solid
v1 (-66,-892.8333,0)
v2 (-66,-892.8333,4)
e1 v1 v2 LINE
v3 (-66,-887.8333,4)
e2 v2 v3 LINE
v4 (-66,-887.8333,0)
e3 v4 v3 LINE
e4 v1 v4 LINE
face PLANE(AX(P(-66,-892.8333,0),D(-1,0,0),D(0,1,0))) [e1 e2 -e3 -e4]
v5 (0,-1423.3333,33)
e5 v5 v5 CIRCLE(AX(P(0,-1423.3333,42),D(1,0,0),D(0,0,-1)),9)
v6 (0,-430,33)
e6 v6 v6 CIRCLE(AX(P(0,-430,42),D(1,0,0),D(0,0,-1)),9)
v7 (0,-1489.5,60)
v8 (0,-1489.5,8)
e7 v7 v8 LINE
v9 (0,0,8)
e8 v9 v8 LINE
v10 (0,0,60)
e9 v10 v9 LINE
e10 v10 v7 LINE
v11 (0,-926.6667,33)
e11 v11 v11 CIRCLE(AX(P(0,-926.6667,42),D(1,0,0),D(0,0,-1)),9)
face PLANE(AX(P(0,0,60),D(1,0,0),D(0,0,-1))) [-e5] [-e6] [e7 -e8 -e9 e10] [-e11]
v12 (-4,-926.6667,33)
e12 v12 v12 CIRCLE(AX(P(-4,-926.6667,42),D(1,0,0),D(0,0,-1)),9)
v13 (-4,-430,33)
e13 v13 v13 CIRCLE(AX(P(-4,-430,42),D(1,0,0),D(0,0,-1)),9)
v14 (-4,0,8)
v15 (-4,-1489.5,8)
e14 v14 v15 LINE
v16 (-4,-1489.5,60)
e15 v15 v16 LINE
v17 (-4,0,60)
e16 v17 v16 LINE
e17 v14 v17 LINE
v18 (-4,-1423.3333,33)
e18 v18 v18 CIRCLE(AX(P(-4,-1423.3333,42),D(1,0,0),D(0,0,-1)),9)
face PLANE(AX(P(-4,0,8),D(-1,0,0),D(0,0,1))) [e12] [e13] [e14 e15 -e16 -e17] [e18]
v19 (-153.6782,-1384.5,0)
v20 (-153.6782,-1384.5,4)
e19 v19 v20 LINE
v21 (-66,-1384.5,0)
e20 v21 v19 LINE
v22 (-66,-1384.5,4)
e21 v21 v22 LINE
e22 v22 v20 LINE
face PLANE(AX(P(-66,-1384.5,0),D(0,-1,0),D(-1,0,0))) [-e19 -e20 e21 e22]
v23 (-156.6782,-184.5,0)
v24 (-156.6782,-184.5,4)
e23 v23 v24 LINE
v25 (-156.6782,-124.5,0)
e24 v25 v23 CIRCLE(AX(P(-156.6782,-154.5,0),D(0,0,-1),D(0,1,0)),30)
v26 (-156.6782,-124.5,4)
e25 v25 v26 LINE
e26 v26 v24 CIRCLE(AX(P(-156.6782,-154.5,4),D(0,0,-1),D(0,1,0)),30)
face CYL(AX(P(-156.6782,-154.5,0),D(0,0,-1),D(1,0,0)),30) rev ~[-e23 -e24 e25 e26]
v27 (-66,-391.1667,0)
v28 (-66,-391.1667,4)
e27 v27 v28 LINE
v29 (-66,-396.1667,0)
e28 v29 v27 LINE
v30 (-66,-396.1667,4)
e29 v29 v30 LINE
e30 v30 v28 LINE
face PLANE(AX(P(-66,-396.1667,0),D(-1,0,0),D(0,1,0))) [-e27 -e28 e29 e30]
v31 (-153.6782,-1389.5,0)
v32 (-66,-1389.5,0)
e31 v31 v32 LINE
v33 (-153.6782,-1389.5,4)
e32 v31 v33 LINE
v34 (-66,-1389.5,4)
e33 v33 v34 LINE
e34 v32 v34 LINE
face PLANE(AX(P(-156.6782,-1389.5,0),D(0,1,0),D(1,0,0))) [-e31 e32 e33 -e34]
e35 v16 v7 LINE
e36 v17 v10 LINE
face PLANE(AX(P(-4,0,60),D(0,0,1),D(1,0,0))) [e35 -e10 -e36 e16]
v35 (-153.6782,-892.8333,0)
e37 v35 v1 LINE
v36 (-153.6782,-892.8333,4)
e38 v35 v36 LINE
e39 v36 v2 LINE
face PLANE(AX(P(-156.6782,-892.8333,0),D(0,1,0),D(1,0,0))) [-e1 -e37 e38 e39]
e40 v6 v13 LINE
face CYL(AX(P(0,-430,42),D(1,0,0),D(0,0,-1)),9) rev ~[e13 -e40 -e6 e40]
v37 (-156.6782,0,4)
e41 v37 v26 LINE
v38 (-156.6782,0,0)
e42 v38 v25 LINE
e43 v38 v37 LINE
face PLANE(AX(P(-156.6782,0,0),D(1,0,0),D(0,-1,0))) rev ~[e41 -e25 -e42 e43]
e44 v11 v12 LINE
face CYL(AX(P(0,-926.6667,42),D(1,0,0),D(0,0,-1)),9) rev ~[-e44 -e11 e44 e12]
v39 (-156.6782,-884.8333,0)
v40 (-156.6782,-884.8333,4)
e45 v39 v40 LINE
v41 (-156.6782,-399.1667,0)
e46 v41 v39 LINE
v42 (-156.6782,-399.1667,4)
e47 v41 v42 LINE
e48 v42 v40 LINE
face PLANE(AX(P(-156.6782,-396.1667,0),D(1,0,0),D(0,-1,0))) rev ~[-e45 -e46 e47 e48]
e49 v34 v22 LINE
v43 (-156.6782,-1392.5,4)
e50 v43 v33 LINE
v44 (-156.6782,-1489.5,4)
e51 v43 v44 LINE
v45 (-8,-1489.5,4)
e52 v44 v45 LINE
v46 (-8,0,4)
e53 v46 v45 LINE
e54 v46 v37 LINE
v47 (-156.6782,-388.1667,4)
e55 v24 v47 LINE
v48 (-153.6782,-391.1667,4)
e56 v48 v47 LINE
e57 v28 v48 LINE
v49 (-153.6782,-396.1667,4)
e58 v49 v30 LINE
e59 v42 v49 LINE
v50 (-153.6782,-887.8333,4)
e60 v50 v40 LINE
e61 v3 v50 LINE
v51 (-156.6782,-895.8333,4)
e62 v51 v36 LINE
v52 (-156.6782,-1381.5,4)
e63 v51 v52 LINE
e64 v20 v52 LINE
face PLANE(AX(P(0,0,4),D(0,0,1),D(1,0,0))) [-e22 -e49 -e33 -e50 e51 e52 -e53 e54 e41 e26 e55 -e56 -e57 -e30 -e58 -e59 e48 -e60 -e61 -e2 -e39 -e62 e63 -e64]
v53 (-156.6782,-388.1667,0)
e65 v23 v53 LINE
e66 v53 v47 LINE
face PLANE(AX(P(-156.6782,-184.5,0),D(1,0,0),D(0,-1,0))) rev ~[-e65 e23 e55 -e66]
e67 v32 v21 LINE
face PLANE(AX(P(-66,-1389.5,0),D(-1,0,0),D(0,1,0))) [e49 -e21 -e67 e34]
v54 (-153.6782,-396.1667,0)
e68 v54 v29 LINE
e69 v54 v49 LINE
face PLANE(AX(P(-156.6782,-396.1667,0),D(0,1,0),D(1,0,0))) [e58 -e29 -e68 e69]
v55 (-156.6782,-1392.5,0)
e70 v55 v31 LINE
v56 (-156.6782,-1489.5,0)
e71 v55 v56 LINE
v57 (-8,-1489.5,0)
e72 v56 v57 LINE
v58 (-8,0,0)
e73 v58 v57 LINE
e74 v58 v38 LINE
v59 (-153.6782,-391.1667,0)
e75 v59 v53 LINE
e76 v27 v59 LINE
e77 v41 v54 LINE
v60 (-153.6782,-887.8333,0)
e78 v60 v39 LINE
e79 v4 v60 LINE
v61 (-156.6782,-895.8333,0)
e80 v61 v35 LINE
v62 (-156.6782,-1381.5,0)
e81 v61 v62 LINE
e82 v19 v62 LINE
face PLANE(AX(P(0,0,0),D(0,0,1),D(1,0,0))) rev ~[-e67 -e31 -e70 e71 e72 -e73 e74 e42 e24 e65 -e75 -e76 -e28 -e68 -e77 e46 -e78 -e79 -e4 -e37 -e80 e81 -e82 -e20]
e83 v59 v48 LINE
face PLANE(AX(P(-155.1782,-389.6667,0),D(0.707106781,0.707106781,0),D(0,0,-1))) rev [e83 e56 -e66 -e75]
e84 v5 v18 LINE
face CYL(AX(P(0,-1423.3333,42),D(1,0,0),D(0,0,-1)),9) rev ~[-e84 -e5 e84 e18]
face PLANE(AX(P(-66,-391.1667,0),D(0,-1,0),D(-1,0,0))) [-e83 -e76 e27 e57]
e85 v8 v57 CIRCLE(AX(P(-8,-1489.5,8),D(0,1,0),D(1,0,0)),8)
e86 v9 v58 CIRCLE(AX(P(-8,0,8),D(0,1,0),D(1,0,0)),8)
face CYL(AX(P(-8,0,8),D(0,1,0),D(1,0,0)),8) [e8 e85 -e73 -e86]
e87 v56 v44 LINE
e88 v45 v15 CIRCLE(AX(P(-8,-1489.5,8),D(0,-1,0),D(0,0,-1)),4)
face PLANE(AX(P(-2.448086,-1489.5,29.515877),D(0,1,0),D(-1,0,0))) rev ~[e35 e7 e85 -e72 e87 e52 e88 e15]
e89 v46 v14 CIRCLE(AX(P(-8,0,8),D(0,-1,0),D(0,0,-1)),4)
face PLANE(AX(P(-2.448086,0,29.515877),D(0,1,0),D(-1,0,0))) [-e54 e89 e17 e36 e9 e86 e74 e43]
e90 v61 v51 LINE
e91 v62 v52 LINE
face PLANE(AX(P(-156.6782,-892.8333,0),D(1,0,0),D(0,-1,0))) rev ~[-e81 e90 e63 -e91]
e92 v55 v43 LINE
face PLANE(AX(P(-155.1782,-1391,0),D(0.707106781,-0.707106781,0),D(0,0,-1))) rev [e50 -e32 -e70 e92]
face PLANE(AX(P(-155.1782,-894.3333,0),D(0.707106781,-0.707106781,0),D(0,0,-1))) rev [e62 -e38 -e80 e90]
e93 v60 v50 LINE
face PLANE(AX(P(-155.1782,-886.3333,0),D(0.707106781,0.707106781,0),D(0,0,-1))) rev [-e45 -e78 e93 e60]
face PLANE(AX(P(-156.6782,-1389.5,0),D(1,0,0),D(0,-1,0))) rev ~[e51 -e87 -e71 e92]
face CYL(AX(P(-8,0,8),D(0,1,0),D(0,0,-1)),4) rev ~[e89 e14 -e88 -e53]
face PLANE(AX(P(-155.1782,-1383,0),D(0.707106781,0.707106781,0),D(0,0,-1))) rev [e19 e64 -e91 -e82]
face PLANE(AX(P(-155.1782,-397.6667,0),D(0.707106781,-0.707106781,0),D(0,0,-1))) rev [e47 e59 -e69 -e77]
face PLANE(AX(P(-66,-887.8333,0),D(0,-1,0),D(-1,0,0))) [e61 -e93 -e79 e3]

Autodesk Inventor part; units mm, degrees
ref_plane "YZ Plane" through (0, 0, 0) normal (1, 0, 0) x (0, 1, 0)
ref_plane "XZ Plane" through (0, 0, 0) normal (0, 1, 0) x (-1, 0, 0)
ref_plane "XY Plane" through (0, 0, 0) normal (0, 0, 1) x (1, 0, 0)
sketch "Sketch1" plane through (0, 0, 0) normal (0, 0, 1) x (1, 0, 0)
  line L0 (0, 0) -> (-156.6782, 0)
  line L1 (-156.6782, 0) -> (-156.6782, -1489.5)
  line L2 (-156.6782, -1489.5) -> (0, -1489.5)
  line L3 (0, -1489.5) -> (0, 0)
  line L4 (-156.6782, -1389.5) -> (-66, -1389.5)
  line L5 (-66, -1389.5) -> (-66, -1384.5)
  line L6 (-66, -1384.5) -> (-156.6782, -1384.5)
  line L7 (-156.6782, -1384.5) -> (-156.6782, -1389.5)
  line L8 (-156.6782, -892.8333) -> (-66, -892.8333)
  line L9 (-66, -892.8333) -> (-66, -887.8333)
  line L10 (-66, -887.8333) -> (-156.6782, -887.8333)
  line L11 (-156.6782, -887.8333) -> (-156.6782, -892.8333)
  line L12 (-156.6782, -396.1667) -> (-66, -396.1667)
  line L13 (-66, -396.1667) -> (-66, -391.1667)
  line L14 (-66, -391.1667) -> (-156.6782, -391.1667)
  line L15 (-156.6782, -391.1667) -> (-156.6782, -396.1667)
  circle A0 centre (-156.6782, -154.5) radius 30
  point P0 (-156.6782, -1384.5)
  point P1 (-156.6782, -124.5)
  point P2 (-156.6782, -184.5)
  dimension "d0" = 1489.5
  dimension "d1" = 156.6782
  dimension "d2" = 5
  dimension "d4" = 100
  dimension "d7" = 496.6667
  dimension "d23" = 66
  dimension "d28" = 60
  dimension "d29" = 1335
extrude "Plate1" add sketch "Sketch1" along normal blind 4 contours L3 L2 L1 L4 L5 L6 L8 L9 L10 L12 L13 L14 A0 L0
sketch "Sketch2" plane through (-4, 0, 0) normal (1, 0, 0) x (0, 1, 0)
  line L0 (-1489.5, 0) -> (0, 0)
  line L1 (0, 0) -> (0, 60)
  line L2 (0, 60) -> (-1489.5, 60)
  line L3 (-1489.5, 60) -> (-1489.5, 0)
edge flange "Flange1" height 60 angle 90 thickness 4 bend radius 4 thickness toward (1, 0, 0) relief tear relief width 4 relief depth 2 edges at (0, -744.75, 4) wall of the first edge with corners at (-4, -1489.5, 0) (-4, 0, 0) (-4, 0, 60) (-4, -1489.5, 60)
bend "Bend1"
corner "Corner1"
chamfer "Corner Chamfer1" distance 3 angle 45 6 edges at (-156.6782, -1389.5, 2) (-156.6782, -1384.5, 2) (-156.6782, -892.8333, 2) (-156.6782, -887.8333, 2) (-156.6782, -391.1667, 2) (-156.6782, -396.1667, 2)
sketch "Sketch4" plane through (0, -1489.5, 60) normal (1, 0, 0) x (0, 0, -1)
  circle A0 centre (18, 1059.5) radius 9
  line L0 (0, 0) -> (0, 1489.5) projected
  circle A1 centre (18, 562.8333) radius 9
  circle A2 centre (18, 66.1667) radius 9
  point P0 (60, 1489.5)
  dimension "d30" = 18
  dimension "d31" = 18
  dimension "d32" = 430
  dimension "d35" = 496.6667
extrude "Cut1" cut sketch "Sketch4" against normal blind 4
equation "\"d0\" = Стрингер_длина"
equation "\"d1\" = стрингер_глубина_4"
equation "\"d2\" = паз_под_стрингер_толщина"
equation "\"d7\" = Шаг_шпангоутов"
equation "\"d23\" = паз_под_стрингер_глубина - Thickness"
equation "\"d28\" = 2 * радиус_выреза_под_сварку"
equation "\"d35\" = Шаг_шпангоутов"
equation "\"d40\" = Thickness"
equation "\"d12\" = Thickness"
equation "\"d13\" = BendReliefWidth"
equation "\"d14\" = BendReliefDepth"
equation "\"d15\" = MinimumRemnant"
equation "\"d16\" = TransitionRadius"
equation "\"d17\" = ребро_усилителей"
equation "\"d19\" = BendRadius"
equation "\"d20\" = CornerReliefSize"
equation "\"d21\" = GapSize"
equation "\"d22\" = JacobiRadiusSize"
equation "\"BendRadius\" = Thickness"
equation "\"BendReliefWidth\" = Thickness"
equation "\"BendReliefDepth\" = 0.5 * Thickness"
equation "\"CornerReliefSize\" = 4 * Thickness"
equation "\"MinimumRemnant\" = 2 * Thickness"
equation "\"TransitionRadius\" = BendRadius"
equation "\"JacobiRadiusSize\" = BendRadius"
equation "\"GapSize\" = Thickness"
equation "\"Стрингер_длина\" = 1489.5"
equation "\"стрингер_глубина_4\" = 156.678203"
equation "\"паз_под_стрингер_толщина\" = 5"
equation "\"Шаг_шпангоутов\" = 496.666667"
equation "\"паз_под_стрингер_глубина\" = 70"
equation "\"Thickness\" = 4"
equation "\"радиус_выреза_под_сварку\" = 30"
equation "\"ребро_усилителей\" = 60"
properties part number "GBK 0202 stringer 4" material "Steel"
